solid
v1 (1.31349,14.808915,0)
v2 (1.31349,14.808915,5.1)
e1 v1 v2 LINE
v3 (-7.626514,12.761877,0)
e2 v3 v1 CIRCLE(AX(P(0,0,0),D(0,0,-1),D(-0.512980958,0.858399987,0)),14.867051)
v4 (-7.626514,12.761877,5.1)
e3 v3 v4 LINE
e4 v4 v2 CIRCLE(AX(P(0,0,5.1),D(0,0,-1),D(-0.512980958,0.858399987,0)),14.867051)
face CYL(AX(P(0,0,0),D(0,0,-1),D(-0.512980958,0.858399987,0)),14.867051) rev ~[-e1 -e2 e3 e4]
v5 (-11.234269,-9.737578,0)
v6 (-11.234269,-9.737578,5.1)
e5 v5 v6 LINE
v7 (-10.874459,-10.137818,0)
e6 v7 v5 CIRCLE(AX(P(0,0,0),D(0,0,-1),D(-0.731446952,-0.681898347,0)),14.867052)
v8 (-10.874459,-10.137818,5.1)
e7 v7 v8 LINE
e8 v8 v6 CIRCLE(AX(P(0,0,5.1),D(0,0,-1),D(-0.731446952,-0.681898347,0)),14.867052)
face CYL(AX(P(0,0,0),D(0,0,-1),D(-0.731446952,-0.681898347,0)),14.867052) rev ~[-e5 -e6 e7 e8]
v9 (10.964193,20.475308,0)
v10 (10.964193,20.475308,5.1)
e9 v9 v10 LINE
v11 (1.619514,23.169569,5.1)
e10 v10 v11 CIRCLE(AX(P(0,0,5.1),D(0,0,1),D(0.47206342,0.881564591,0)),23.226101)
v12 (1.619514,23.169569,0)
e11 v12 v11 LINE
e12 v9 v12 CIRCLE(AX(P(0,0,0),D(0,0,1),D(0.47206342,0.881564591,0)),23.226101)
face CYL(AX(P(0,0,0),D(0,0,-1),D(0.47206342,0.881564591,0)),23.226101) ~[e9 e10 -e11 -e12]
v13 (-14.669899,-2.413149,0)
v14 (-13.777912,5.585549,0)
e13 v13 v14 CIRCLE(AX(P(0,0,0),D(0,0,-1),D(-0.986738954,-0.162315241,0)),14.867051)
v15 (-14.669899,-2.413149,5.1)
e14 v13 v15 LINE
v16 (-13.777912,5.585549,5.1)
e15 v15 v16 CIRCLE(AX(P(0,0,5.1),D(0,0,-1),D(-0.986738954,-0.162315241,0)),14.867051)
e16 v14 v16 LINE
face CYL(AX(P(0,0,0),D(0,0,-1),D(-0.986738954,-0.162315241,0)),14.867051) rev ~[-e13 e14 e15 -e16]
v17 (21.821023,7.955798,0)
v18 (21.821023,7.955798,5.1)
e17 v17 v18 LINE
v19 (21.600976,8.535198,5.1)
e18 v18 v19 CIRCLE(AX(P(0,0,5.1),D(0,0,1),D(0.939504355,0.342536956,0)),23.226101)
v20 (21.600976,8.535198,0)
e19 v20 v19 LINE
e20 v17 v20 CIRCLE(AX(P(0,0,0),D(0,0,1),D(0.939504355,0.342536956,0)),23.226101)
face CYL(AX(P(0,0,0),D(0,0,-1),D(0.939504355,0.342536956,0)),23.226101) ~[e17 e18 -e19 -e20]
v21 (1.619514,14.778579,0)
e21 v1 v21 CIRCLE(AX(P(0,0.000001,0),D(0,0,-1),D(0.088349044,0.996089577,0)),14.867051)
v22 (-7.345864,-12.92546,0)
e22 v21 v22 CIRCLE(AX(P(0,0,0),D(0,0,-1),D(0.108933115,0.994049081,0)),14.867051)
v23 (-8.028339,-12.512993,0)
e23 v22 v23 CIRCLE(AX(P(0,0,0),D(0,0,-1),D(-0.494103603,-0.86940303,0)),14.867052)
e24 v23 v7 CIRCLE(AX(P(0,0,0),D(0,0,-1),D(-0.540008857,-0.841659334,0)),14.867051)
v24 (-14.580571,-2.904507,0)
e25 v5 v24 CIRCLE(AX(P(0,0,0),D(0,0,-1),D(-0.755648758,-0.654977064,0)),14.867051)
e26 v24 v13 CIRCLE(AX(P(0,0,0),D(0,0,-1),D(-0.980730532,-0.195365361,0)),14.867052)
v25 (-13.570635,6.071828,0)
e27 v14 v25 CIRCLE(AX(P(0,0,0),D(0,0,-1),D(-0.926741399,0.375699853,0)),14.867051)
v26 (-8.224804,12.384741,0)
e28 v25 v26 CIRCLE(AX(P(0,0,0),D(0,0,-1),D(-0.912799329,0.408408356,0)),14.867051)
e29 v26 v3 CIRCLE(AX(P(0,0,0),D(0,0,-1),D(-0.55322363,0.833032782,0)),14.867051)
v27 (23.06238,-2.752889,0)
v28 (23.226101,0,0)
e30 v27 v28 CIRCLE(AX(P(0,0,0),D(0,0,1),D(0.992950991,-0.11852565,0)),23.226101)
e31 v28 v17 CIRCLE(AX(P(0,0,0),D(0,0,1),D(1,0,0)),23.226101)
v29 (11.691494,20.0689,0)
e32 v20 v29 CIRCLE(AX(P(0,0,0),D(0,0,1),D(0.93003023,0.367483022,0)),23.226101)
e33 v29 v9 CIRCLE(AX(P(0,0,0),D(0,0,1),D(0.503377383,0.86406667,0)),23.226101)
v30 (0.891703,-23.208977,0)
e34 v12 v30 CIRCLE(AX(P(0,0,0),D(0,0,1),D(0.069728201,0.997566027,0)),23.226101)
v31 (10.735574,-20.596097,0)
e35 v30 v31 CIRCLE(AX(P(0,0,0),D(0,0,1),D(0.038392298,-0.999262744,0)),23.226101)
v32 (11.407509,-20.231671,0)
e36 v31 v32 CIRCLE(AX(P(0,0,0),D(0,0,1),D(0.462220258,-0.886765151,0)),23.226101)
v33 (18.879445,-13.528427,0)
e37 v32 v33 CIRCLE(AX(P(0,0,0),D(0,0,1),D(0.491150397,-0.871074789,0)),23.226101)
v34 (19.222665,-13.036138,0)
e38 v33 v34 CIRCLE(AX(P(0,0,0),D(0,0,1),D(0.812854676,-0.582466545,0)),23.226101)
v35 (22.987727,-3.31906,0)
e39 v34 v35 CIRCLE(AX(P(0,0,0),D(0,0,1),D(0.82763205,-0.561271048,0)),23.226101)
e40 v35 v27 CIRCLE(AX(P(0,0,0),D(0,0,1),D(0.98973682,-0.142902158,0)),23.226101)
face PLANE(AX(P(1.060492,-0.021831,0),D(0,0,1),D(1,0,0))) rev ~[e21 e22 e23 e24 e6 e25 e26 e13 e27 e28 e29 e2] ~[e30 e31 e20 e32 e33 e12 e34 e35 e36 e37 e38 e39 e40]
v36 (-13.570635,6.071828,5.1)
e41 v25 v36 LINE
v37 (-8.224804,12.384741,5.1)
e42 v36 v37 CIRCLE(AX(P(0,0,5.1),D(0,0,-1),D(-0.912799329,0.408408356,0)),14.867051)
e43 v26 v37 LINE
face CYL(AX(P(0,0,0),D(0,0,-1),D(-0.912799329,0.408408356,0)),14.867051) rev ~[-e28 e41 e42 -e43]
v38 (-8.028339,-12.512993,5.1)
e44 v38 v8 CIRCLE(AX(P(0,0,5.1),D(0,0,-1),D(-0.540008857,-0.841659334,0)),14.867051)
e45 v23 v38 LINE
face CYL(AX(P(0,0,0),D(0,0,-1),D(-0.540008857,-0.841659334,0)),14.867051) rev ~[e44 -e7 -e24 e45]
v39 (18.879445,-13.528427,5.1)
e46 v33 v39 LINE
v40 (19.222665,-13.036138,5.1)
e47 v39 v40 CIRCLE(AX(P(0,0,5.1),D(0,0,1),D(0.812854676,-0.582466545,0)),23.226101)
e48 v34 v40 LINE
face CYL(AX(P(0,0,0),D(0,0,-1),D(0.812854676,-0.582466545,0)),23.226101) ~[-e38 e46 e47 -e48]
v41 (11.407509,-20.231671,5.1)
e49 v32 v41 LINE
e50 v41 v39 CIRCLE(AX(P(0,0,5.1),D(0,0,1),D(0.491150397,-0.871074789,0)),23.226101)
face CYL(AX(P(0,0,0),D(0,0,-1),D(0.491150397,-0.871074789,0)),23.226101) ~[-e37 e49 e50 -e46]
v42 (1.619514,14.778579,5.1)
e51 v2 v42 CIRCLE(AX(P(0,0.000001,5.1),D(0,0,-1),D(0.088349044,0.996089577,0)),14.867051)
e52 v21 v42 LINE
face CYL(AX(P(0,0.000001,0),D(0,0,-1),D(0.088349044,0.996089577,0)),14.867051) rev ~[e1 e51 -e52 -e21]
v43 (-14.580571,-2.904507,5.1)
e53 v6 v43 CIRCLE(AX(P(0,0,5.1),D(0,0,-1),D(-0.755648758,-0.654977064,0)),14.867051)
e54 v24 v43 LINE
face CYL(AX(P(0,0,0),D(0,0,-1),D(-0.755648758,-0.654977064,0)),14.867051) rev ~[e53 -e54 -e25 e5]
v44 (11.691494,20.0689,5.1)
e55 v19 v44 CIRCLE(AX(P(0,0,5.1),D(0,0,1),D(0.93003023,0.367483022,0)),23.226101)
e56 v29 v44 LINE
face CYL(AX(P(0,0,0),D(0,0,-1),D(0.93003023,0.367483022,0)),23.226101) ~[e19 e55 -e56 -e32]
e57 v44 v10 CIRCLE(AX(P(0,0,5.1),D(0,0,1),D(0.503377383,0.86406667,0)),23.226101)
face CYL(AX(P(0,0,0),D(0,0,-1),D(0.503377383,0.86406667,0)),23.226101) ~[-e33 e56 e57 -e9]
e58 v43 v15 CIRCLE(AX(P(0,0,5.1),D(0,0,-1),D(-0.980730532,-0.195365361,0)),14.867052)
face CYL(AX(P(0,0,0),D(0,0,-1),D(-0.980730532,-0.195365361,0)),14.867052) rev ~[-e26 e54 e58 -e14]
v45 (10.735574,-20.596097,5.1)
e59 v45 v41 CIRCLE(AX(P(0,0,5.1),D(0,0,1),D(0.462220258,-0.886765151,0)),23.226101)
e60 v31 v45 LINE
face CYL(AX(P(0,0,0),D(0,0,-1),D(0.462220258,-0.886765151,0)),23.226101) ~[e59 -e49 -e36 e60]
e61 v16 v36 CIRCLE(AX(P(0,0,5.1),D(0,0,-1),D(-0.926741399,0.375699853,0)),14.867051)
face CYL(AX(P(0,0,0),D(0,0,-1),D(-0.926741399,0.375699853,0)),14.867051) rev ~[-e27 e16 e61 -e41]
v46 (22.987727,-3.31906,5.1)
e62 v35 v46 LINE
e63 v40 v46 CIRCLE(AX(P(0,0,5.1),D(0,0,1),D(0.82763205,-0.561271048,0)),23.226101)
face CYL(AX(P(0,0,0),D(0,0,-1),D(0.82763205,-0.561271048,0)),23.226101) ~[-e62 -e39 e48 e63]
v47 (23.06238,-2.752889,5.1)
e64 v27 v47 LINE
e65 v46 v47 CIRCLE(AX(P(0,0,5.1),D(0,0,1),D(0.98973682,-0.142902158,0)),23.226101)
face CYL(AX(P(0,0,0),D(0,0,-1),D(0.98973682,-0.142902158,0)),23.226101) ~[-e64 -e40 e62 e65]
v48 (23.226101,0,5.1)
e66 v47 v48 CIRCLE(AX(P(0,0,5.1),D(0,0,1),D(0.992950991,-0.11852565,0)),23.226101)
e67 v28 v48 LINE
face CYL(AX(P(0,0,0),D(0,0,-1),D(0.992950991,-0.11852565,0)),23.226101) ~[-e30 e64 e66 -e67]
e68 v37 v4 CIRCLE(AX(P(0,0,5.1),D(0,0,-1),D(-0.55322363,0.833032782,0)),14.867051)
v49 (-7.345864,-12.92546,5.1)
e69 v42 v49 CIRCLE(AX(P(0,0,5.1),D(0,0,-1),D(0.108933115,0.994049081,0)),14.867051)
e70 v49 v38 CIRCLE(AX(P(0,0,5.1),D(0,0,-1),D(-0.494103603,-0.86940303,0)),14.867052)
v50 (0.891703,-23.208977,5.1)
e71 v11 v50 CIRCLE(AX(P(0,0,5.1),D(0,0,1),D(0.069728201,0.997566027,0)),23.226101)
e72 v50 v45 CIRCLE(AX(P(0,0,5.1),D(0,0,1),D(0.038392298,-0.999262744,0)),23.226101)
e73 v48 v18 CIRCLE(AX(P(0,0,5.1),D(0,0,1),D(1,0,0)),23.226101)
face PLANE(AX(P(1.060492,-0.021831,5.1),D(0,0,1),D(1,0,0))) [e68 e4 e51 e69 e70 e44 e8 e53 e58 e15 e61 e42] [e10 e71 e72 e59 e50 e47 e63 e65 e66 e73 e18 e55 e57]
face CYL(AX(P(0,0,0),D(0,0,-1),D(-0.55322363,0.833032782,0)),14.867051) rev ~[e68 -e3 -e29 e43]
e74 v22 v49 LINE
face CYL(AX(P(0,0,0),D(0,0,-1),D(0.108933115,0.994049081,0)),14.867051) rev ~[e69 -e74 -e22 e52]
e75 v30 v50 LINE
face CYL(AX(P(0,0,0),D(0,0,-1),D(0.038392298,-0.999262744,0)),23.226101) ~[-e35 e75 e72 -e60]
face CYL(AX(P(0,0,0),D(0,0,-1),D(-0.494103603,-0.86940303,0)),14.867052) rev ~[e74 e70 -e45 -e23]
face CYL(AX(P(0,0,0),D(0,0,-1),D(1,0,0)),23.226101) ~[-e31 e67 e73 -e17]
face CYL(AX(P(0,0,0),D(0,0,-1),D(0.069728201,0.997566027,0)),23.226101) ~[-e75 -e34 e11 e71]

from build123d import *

# Parameters (mm, degrees)
F1_DEPTH = 5.1


with BuildPart() as f1:
    # F0 (on Top) → F1 (new body)
    with BuildSketch(Plane.XY):
        with BuildLine():
            ThreePointArc((23.0623797864, -2.752888696), (23.1851344055, -1.378876421), (23.2261007831, 0))
            ThreePointArc((23.2261007831, 0), (22.8721340644, 4.039460475), (21.8210228424, 7.9557978667))
            ThreePointArc((21.8210228424, 7.9557978667), (21.7129320627, 8.2462317956), (21.600975855, 8.5351976954))
            ThreePointArc((21.600975855, 8.5351976954), (17.6168585154, 15.135985387), (11.6914938176, 20.0688995687))
            ThreePointArc((11.6914938176, 20.0688995687), (11.3296656288, 20.2753652082), (10.9641925592, 20.4753080346))
            ThreePointArc((10.9641925592, 20.4753080346), (6.4344525637, 22.3170243938), (1.6195142321, 23.1695690775))
            ThreePointArc((1.6195142321, 23.1695690775), (-23.2232414227, 0.3644384862), (0.891703377, -23.2089772001))
            ThreePointArc((0.891703377, -23.2089772001), (5.9586225424, -22.4487544194), (10.7355743028, -20.5960967655))
            ThreePointArc((10.7355743028, -20.5960967655), (11.0730407687, -20.4166482489), (11.4075086171, -20.231670834))
            ThreePointArc((11.4075086171, -20.231670834), (15.509940512, -17.2885367484), (18.8794446221, -13.5284266767))
            ThreePointArc((18.8794446221, -13.5284266767), (19.0526450726, -13.283390882), (19.2226654093, -13.0361379307))
            ThreePointArc((19.2226654093, -13.0361379307), (21.6572092153, -8.3914865543), (22.9877271358, -3.3190599146))
            ThreePointArc((22.9877271358, -3.3190599146), (23.0267936185, -3.0362037542), (23.0623797864, -2.752888696))
        make_face()
        with BuildLine():
            ThreePointArc((-7.6265143045, 12.7618767873), (-3.3183069466, 14.491999813), (1.3134897969, 14.8089150219))
            ThreePointArc((1.3134897969, 14.8089150219), (1.4665804544, 14.7945382268), (1.6195142321, 14.7785788635))
            ThreePointArc((1.6195142321, 14.7785788635), (11.0703798721, 9.9235028624), (14.8670514754, 0))
            ThreePointArc((14.8670514754, 0), (7.4772282889, -12.8499134895), (-7.3458637029, -12.9254596062))
            ThreePointArc((-7.3458637029, -12.9254596062), (-7.689867558, -12.7238027536), (-8.0283394714, -12.5129926438))
            ThreePointArc((-8.0283394714, -12.5129926438), (-9.5257186584, -11.4144602856), (-10.874459487, -10.1378178341))
            ThreePointArc((-10.874459487, -10.1378178341), (-11.0561755007, -9.9393260772), (-11.2342689854, -9.7375777243))
            ThreePointArc((-11.2342689854, -9.7375777243), (-13.3519365266, -6.5387315713), (-14.5805712978, -2.9045068776))
            ThreePointArc((-14.5805712978, -2.9045068776), (-14.6272984034, -2.6592030743), (-14.6698988149, -2.4131490494))
            ThreePointArc((-14.6698988149, -2.4131490494), (-14.7754620576, 1.6477076674), (-13.7779120757, 5.5855490693))
            ThreePointArc((-13.7779120757, 5.5855490693), (-13.6764347777, 5.8296098793), (-13.570634607, 6.0718280554))
            ThreePointArc((-13.570634607, 6.0718280554), (-11.3456382043, 9.6075862374), (-8.2248041845, 12.3847412448))
            ThreePointArc((-8.2248041845, 12.3847412448), (-7.9279021351, 12.57686715), (-7.6265143045, 12.7618767873))
        make_face(mode=Mode.SUBTRACT)
    extrude(amount=F1_DEPTH)


solid = f1.part
